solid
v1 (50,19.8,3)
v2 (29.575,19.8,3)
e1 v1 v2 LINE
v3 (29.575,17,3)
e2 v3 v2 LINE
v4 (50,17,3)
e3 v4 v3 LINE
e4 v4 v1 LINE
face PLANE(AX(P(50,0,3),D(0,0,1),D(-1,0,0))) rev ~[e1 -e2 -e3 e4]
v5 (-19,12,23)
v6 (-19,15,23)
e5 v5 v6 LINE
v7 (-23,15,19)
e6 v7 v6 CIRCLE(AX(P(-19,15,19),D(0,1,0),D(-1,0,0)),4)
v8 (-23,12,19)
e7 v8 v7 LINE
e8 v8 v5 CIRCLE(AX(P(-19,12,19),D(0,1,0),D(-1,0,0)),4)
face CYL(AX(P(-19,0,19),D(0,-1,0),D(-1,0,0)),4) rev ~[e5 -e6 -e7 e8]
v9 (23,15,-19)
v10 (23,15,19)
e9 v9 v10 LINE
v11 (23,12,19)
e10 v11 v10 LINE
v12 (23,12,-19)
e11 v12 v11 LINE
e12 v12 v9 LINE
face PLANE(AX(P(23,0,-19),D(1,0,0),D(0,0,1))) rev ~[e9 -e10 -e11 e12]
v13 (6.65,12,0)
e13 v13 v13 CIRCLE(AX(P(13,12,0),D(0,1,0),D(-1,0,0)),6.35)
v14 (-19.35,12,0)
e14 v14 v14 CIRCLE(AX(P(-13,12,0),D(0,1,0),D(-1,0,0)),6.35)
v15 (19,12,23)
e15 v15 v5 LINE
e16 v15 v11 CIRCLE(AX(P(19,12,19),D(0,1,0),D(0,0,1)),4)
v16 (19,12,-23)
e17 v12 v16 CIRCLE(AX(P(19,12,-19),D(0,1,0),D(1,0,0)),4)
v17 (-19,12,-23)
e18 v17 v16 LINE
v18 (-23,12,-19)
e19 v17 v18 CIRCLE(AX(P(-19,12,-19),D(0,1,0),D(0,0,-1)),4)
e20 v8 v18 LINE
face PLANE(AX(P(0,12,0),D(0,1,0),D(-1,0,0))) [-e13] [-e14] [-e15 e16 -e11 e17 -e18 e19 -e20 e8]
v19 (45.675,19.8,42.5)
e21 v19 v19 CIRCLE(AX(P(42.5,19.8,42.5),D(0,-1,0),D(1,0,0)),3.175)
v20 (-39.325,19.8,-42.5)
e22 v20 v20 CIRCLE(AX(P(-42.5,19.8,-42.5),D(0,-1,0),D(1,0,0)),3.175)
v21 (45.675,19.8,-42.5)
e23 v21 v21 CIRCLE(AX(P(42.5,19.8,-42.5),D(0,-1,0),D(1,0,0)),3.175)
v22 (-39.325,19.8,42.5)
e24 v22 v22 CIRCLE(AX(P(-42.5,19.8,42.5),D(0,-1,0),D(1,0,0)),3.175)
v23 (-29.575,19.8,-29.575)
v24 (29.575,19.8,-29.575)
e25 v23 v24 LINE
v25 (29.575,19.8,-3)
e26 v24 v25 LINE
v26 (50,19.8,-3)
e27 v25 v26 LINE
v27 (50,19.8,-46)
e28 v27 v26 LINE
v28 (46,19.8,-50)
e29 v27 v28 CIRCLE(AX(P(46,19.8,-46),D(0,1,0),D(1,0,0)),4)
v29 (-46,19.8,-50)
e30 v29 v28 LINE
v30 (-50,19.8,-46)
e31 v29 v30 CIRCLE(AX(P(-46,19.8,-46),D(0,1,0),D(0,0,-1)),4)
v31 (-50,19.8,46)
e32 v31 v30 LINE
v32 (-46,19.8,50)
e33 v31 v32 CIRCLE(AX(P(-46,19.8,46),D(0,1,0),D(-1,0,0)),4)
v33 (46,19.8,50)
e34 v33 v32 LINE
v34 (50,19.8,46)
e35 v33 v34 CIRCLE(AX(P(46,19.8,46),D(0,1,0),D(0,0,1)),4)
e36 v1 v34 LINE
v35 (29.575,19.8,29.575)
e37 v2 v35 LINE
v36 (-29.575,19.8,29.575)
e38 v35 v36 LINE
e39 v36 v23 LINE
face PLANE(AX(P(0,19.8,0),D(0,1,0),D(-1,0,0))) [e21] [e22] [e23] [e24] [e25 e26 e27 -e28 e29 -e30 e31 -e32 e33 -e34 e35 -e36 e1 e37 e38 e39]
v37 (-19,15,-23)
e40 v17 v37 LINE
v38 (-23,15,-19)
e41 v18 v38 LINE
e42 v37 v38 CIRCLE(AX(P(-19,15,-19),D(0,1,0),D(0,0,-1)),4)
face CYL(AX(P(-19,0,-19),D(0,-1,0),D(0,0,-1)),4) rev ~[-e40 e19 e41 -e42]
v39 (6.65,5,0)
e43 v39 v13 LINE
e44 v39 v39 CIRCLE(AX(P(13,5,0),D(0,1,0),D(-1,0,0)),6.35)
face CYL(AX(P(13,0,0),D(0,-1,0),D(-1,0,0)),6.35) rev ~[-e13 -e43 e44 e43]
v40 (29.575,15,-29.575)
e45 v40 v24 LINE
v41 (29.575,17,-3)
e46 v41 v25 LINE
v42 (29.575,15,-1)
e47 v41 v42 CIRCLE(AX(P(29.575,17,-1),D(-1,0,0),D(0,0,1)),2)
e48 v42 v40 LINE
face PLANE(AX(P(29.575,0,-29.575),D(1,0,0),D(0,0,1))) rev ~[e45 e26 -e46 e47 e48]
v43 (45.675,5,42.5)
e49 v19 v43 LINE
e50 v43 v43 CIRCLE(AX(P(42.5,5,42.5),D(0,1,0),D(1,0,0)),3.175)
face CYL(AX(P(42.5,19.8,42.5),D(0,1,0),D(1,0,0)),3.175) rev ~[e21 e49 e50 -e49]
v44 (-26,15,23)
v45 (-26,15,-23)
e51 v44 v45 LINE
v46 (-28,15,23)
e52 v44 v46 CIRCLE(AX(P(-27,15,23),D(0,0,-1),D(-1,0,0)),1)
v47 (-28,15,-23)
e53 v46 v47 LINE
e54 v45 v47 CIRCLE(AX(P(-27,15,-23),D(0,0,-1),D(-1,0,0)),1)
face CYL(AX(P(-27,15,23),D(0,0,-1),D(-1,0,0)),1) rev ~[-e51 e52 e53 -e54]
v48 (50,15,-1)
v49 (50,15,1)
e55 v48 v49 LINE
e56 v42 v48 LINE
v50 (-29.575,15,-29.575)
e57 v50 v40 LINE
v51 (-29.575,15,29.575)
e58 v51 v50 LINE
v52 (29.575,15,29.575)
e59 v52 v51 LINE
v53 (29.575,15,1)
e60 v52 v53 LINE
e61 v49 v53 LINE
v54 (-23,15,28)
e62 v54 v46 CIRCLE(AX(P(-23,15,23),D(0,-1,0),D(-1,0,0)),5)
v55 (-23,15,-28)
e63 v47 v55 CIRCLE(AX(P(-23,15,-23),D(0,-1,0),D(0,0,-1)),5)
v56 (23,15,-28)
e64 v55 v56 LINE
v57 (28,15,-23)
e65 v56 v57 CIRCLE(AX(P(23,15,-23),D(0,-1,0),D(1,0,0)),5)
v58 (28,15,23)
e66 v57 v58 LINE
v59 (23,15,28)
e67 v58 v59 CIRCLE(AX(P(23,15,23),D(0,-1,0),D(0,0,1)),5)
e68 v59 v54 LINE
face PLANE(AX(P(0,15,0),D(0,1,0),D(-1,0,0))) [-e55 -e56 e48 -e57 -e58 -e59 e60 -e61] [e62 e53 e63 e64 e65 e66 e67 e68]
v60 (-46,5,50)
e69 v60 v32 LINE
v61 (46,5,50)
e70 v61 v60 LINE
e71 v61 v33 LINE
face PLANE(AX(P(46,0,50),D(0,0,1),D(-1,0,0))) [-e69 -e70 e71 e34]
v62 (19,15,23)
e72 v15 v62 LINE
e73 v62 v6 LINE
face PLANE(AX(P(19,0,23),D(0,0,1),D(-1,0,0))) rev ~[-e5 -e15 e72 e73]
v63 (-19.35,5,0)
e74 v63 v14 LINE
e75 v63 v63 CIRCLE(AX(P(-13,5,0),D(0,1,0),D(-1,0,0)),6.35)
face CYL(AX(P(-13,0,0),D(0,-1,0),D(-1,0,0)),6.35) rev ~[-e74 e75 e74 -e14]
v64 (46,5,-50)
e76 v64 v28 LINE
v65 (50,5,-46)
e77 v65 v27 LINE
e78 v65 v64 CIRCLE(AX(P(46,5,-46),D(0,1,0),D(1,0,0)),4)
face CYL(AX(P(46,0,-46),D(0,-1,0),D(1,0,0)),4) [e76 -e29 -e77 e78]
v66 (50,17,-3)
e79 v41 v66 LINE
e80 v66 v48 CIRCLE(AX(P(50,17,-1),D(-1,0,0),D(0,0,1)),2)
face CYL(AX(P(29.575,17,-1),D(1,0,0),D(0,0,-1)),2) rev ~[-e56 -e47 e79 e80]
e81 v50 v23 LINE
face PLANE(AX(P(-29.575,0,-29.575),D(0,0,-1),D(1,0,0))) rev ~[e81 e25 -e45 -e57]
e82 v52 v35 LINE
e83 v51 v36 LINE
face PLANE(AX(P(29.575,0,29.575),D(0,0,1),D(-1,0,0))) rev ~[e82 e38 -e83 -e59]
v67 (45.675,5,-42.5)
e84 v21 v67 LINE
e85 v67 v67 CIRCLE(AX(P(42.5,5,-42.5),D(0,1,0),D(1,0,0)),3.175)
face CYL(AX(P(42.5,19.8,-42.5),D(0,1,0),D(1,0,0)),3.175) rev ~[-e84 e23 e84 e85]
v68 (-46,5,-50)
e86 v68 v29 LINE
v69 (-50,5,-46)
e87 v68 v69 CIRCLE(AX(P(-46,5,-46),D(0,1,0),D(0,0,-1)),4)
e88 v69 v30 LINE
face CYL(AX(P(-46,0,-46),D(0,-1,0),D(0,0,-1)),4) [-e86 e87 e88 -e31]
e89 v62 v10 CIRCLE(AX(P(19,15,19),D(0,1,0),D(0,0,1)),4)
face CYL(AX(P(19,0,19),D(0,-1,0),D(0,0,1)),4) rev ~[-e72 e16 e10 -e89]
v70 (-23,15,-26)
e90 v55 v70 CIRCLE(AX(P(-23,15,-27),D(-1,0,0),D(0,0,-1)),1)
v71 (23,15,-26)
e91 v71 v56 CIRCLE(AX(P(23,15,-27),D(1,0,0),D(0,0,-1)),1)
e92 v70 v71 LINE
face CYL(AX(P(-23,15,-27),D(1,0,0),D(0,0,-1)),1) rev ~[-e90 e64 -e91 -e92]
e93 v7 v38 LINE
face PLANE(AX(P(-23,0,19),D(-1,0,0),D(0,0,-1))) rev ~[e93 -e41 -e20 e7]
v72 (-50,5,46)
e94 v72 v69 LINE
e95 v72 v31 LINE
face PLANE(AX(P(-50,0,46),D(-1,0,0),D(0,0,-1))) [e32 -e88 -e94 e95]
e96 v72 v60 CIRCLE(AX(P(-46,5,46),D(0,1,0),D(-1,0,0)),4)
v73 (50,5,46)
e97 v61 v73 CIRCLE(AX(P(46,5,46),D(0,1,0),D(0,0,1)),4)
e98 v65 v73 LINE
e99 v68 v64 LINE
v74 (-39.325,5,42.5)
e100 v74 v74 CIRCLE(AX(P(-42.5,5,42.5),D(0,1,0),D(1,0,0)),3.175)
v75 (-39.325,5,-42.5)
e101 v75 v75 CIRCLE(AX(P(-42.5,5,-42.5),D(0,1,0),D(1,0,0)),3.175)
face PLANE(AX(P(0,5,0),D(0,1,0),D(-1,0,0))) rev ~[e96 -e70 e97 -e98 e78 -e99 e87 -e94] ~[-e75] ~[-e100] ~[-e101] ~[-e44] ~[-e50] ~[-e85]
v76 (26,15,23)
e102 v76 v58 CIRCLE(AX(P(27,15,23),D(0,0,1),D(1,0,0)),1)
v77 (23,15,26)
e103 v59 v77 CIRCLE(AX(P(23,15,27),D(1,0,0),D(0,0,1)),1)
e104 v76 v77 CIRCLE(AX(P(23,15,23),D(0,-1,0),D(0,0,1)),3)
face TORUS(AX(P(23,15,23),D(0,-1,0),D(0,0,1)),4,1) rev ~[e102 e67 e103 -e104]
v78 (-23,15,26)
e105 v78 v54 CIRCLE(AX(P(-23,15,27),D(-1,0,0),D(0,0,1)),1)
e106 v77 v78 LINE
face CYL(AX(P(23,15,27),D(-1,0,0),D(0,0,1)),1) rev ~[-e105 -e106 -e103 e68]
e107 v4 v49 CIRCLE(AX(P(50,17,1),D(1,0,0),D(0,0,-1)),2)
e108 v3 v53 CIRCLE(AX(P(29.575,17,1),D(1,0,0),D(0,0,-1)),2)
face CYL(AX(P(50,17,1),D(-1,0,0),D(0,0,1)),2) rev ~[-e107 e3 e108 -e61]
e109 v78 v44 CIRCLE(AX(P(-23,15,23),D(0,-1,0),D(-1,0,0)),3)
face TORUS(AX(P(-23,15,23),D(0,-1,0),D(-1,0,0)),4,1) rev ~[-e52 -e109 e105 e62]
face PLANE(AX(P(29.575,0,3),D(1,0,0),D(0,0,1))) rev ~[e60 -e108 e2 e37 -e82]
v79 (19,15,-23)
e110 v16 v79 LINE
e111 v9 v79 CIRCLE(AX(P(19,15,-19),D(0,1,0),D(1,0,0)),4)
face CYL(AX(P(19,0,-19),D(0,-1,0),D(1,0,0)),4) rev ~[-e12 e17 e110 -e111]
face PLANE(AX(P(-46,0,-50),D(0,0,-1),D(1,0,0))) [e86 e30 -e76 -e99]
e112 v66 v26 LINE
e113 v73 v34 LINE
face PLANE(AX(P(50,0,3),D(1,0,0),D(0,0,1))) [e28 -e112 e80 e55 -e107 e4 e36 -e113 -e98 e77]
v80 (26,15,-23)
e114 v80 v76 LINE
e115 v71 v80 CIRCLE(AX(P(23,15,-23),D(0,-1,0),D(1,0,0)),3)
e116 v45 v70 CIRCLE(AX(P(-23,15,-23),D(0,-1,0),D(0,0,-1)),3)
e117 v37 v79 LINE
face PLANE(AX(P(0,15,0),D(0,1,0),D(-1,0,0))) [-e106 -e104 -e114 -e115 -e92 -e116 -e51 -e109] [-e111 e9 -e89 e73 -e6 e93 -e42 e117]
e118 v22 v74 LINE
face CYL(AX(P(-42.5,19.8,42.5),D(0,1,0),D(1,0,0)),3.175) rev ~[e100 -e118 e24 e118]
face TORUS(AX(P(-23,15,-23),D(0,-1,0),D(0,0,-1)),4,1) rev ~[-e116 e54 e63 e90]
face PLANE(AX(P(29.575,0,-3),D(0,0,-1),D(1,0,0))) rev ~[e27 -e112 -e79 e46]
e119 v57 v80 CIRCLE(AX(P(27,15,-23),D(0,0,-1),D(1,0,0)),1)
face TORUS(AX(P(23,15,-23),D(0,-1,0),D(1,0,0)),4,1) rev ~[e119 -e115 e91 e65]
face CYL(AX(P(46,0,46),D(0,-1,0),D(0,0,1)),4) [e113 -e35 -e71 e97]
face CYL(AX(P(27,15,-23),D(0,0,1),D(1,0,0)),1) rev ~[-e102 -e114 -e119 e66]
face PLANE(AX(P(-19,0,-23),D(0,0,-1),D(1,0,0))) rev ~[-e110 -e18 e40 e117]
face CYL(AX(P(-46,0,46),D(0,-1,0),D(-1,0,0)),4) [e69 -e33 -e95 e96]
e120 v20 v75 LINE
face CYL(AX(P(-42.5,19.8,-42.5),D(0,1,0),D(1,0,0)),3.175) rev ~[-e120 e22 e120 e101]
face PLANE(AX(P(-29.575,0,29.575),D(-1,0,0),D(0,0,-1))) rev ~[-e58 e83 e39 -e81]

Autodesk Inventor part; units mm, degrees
ref_plane "YZ Plane" through (0, 0, 0) normal (1, 0, 0) x (0, 1, 0)
ref_plane "XZ Plane" through (0, 0, 0) normal (0, 1, 0) x (-1, 0, 0)
sketch "peltier" plane through (0, 0, 0) normal (0, 0, 1) x (1, 0, 0)
  line L0 (7.1779, -44.0485) -> (-50.9721, -44.0485)
  line L1 (-50.9721, -44.0485) -> (-50.9721, -102.2985)
  line L2 (-50.9721, -102.2985) -> (7.1779, -102.2985)
  line L3 (7.1779, -102.2985) -> (7.1779, -44.0485)
  point P0 (-21.8971, -73.1735)
  point P1 (-21.8971, -73.1735)
  dimension "d0" = 58.25
  dimension "d1" = 58.15
sketch "Sketch1" plane through (0, 0, 0) normal (0, 1, 0) x (-1, 0, 0)
  line L0 (-46, 50) -> (46, 50)
  line L1 (50, 46) -> (50, -46)
  line L2 (46, -50) -> (-46, -50)
  line L3 (-50, -46) -> (-50, 46)
  line L4 (-50, 50) -> (50, -50) construction
  line L5 (50, 50) -> (-50, -50) construction
  line L6 (-29.575, 29.575) -> (29.575, 29.575)
  line L7 (29.575, 29.575) -> (29.575, -29.575)
  line L8 (29.575, -29.575) -> (-29.575, -29.575)
  line L9 (-29.575, -29.575) -> (-29.575, 29.575)
  line L10 (-29.575, 29.575) -> (29.575, -29.575) construction
  line L11 (29.575, 29.575) -> (-29.575, -29.575) construction
  line L12 (-29.575, 0) -> (-50, 0)
  line L13 (-19, 23) -> (19, 23)
  line L14 (23, 19) -> (23, -19)
  line L15 (19, -23) -> (-19, -23)
  line L16 (-23, -19) -> (-23, 19)
  line L17 (-23, 23) -> (23, -23) construction
  line L18 (23, 23) -> (-23, -23) construction
  arc A0 (50, 46) -> (46, 50) centre (46, 46) ccw
  arc A1 (-46, 50) -> (-50, 46) centre (-46, 46) ccw
  arc A2 (-50, -46) -> (-46, -50) centre (-46, -46) ccw
  arc A3 (46, -50) -> (50, -46) centre (46, -46) ccw
  arc A4 (23, 19) -> (19, 23) centre (19, 19) ccw
  arc A5 (-19, 23) -> (-23, 19) centre (-19, 19) ccw
  arc A6 (-23, -19) -> (-19, -23) centre (-19, -19) ccw
  arc A7 (19, -23) -> (23, -19) centre (19, -19) ccw
  line L19 (-29.575, 0) -> (-29.575, -3)
  line L20 (-29.575, -3) -> (-50, -3)
  line L21 (-50, -3) -> (-50, 3)
  line L22 (-50, 3) -> (-29.575, 3)
  line L23 (-29.575, 3) -> (-29.575, -3)
  circle A8 centre (13, 0) radius 6.35
  circle A9 centre (-13, 0) radius 6.35
  line L24 (29.075, 29.125) -> (-29.075, 29.125)
  line L25 (-29.075, 29.125) -> (-29.075, -29.125)
  line L26 (-29.075, -29.125) -> (29.075, -29.125)
  line L27 (29.075, -29.125) -> (29.075, 29.125)
  point P0 (0, 0)
  point P1 (0, 0)
  dimension "d2" = 100
  dimension "d3" = 100
  dimension "d4" = 0.5
  dimension "d5" = 4
  dimension "d6" = 46
  dimension "d7" = 46
  dimension "d8" = 4
  dimension "d13" = 3
  dimension "d14" = 6
  dimension "d17" = 12.7
  dimension "d18" = 13
  dimension "d19" = 13
  dimension "d20" = 12.7
extrude "Extrusion1" add sketch "Sketch1" along normal blind 20 contours L0 A0 L1 A3 L2 A2 L3 L20 L9 L8 L7 L6 L22 A1
extrude "Extrusion2" add sketch "Sketch1" along normal blind 15 contours L22 L9 L12 L3 | L12 L9 L20 L3 | L9 L6 L7 L8 | L27 L26 L25 L24
extrude "Extrusion3" add sketch "Sketch1" along normal blind 12 contours L13 A4 L14 A7 L15 A6 L16 A5
sketch "Sketch2" plane through (0, 15, 0) normal (0, 1, 0) x (1, 0, 0)
  line L0 (-29.575, -29.575) -> (-29.575, 29.575) projected
  line L1 (29.575, -29.575) -> (-29.575, -29.575) projected
  line L2 (29.575, -3) -> (29.575, -29.575) projected
  line L3 (50, -3) -> (29.575, -3) projected
  line L4 (50, -3) -> (50, 3) projected
  line L5 (29.575, 3) -> (50, 3) projected
  line L6 (29.575, 29.575) -> (29.575, 3) projected
  line L7 (-29.575, 29.575) -> (29.575, 29.575) projected
  line L8 (23, 19) -> (23, -19) projected
  arc A0 (19, -23) -> (23, -19) centre (19, -19) ccw projected
  line L9 (19, -23) -> (-19, -23) projected
  arc A1 (-23, -19) -> (-19, -23) centre (-19, -19) ccw projected
  line L10 (-23, -19) -> (-23, 19) projected
  arc A2 (-19, 23) -> (-23, 19) centre (-19, 19) ccw projected
  line L11 (-19, 23) -> (19, 23) projected
  arc A3 (23, 19) -> (19, 23) centre (19, 19) ccw projected
  line L12 (23, -27) -> (-23, -27)
  line L13 (-27, -23) -> (-27, 23)
  line L14 (-23, 27) -> (23, 27)
  line L15 (27, 23) -> (27, -23)
  line L16 (27, -27) -> (-27, 27) construction
  line L17 (-27, -27) -> (27, 27) construction
  arc A4 (-27, -23) -> (-23, -27) centre (-23, -23) ccw
  arc A5 (-23, 27) -> (-27, 23) centre (-23, 23) ccw
  arc A6 (27, 23) -> (23, 27) centre (23, 23) ccw
  arc A7 (23, -27) -> (27, -23) centre (23, -23) ccw
  point P0 (0, 0)
  dimension "d21" = 4
  dimension "d25" = 4
  dimension "d29" = 4
ref_plane "Work Plane2" through (-27, 15, 23) normal (0, 0, -1) x (-1, 0, 0)
sketch "Sketch4" plane through (-27, 15, 23) normal (0, 0, -1) x (-1, 0, 0)
  circle A0 centre (0, 0) radius 1
  point P0 (-27, -15)
  dimension "d26" = 2
sweep "Sweep2" cut profiles "Sketch4" path "Sketch2" path curves L13 A5 L14 A6 L15 A7 L12 A4
thread "Thread1"
thread "Thread2"
move faces "Move1" translate (0, 5, 0) faces at (-3.5828, 0, -35.3125)
move faces "Move2" translate (0, -0.2, 0) faces at (-43.1917, 20, 9.8583)
fillet "Fillet1" radius 2 2 edges at (39.7875, 15, 3) (39.7875, 15, -3)
sketch "Sketch6" plane through (-46, 19.8, -50) normal (0, 1, 0) x (1, 0, 0)
  line L0 (96, -96) -> (96, -53) projected
  line L1 (96, -53) -> (75.575, -53) projected
  line L2 (75.575, -53) -> (75.575, -79.575) projected
  line L3 (75.575, -79.575) -> (16.425, -79.575) projected
  line L4 (16.425, -79.575) -> (16.425, -20.425) projected
  line L5 (16.425, -20.425) -> (75.575, -20.425) projected
  line L6 (75.575, -20.425) -> (75.575, -47) projected
  line L7 (75.575, -47) -> (96, -47) projected
  line L8 (96, -47) -> (96, -4) projected
  arc A0 (96, -4) -> (92, 0) centre (92, -4) ccw projected
  line L9 (92, 0) -> (0, 0) projected
  arc A1 (0, 0) -> (-4, -4) centre (0, -4) ccw projected
  line L10 (-4, -4) -> (-4, -96) projected
  arc A2 (-4, -96) -> (0, -100) centre (0, -96) ccw projected
  line L11 (0, -100) -> (92, -100) projected
  arc A3 (92, -100) -> (96, -96) centre (92, -96) ccw projected
  line L12 (3.5, -92.5) -> (88.5, -92.5)
  line L13 (88.5, -92.5) -> (88.5, -7.5)
  line L14 (88.5, -7.5) -> (3.5, -7.5)
  line L15 (3.5, -7.5) -> (3.5, -92.5)
  line L16 (3.5, -92.5) -> (88.5, -7.5) construction
  line L17 (88.5, -92.5) -> (3.5, -7.5) construction
  circle A4 centre (3.5, -92.5) radius 3.175
  circle A5 centre (3.5, -7.5) radius 3.175
  circle A6 centre (88.5, -92.5) radius 3.175
  circle A7 centre (88.5, -7.5) radius 3.175
  point P0 (46, -50)
  dimension "d43" = 6.35
  dimension "d45" = 85
  dimension "d46" = 85
  dimension "d49" = 85
  dimension "d52" = 85
extrude "Extrusion4" cut sketch "Sketch6" against normal up to surface (14.8 mm away) contours A6 L12 L13 | L13 L12 A6 | A7 L14 L13 | L13 L14 A7 | A4 L15 L12 | L12 L15 A4 | A5 L15 L14 | L14 L15 A5
properties part number "inf_soporte"
